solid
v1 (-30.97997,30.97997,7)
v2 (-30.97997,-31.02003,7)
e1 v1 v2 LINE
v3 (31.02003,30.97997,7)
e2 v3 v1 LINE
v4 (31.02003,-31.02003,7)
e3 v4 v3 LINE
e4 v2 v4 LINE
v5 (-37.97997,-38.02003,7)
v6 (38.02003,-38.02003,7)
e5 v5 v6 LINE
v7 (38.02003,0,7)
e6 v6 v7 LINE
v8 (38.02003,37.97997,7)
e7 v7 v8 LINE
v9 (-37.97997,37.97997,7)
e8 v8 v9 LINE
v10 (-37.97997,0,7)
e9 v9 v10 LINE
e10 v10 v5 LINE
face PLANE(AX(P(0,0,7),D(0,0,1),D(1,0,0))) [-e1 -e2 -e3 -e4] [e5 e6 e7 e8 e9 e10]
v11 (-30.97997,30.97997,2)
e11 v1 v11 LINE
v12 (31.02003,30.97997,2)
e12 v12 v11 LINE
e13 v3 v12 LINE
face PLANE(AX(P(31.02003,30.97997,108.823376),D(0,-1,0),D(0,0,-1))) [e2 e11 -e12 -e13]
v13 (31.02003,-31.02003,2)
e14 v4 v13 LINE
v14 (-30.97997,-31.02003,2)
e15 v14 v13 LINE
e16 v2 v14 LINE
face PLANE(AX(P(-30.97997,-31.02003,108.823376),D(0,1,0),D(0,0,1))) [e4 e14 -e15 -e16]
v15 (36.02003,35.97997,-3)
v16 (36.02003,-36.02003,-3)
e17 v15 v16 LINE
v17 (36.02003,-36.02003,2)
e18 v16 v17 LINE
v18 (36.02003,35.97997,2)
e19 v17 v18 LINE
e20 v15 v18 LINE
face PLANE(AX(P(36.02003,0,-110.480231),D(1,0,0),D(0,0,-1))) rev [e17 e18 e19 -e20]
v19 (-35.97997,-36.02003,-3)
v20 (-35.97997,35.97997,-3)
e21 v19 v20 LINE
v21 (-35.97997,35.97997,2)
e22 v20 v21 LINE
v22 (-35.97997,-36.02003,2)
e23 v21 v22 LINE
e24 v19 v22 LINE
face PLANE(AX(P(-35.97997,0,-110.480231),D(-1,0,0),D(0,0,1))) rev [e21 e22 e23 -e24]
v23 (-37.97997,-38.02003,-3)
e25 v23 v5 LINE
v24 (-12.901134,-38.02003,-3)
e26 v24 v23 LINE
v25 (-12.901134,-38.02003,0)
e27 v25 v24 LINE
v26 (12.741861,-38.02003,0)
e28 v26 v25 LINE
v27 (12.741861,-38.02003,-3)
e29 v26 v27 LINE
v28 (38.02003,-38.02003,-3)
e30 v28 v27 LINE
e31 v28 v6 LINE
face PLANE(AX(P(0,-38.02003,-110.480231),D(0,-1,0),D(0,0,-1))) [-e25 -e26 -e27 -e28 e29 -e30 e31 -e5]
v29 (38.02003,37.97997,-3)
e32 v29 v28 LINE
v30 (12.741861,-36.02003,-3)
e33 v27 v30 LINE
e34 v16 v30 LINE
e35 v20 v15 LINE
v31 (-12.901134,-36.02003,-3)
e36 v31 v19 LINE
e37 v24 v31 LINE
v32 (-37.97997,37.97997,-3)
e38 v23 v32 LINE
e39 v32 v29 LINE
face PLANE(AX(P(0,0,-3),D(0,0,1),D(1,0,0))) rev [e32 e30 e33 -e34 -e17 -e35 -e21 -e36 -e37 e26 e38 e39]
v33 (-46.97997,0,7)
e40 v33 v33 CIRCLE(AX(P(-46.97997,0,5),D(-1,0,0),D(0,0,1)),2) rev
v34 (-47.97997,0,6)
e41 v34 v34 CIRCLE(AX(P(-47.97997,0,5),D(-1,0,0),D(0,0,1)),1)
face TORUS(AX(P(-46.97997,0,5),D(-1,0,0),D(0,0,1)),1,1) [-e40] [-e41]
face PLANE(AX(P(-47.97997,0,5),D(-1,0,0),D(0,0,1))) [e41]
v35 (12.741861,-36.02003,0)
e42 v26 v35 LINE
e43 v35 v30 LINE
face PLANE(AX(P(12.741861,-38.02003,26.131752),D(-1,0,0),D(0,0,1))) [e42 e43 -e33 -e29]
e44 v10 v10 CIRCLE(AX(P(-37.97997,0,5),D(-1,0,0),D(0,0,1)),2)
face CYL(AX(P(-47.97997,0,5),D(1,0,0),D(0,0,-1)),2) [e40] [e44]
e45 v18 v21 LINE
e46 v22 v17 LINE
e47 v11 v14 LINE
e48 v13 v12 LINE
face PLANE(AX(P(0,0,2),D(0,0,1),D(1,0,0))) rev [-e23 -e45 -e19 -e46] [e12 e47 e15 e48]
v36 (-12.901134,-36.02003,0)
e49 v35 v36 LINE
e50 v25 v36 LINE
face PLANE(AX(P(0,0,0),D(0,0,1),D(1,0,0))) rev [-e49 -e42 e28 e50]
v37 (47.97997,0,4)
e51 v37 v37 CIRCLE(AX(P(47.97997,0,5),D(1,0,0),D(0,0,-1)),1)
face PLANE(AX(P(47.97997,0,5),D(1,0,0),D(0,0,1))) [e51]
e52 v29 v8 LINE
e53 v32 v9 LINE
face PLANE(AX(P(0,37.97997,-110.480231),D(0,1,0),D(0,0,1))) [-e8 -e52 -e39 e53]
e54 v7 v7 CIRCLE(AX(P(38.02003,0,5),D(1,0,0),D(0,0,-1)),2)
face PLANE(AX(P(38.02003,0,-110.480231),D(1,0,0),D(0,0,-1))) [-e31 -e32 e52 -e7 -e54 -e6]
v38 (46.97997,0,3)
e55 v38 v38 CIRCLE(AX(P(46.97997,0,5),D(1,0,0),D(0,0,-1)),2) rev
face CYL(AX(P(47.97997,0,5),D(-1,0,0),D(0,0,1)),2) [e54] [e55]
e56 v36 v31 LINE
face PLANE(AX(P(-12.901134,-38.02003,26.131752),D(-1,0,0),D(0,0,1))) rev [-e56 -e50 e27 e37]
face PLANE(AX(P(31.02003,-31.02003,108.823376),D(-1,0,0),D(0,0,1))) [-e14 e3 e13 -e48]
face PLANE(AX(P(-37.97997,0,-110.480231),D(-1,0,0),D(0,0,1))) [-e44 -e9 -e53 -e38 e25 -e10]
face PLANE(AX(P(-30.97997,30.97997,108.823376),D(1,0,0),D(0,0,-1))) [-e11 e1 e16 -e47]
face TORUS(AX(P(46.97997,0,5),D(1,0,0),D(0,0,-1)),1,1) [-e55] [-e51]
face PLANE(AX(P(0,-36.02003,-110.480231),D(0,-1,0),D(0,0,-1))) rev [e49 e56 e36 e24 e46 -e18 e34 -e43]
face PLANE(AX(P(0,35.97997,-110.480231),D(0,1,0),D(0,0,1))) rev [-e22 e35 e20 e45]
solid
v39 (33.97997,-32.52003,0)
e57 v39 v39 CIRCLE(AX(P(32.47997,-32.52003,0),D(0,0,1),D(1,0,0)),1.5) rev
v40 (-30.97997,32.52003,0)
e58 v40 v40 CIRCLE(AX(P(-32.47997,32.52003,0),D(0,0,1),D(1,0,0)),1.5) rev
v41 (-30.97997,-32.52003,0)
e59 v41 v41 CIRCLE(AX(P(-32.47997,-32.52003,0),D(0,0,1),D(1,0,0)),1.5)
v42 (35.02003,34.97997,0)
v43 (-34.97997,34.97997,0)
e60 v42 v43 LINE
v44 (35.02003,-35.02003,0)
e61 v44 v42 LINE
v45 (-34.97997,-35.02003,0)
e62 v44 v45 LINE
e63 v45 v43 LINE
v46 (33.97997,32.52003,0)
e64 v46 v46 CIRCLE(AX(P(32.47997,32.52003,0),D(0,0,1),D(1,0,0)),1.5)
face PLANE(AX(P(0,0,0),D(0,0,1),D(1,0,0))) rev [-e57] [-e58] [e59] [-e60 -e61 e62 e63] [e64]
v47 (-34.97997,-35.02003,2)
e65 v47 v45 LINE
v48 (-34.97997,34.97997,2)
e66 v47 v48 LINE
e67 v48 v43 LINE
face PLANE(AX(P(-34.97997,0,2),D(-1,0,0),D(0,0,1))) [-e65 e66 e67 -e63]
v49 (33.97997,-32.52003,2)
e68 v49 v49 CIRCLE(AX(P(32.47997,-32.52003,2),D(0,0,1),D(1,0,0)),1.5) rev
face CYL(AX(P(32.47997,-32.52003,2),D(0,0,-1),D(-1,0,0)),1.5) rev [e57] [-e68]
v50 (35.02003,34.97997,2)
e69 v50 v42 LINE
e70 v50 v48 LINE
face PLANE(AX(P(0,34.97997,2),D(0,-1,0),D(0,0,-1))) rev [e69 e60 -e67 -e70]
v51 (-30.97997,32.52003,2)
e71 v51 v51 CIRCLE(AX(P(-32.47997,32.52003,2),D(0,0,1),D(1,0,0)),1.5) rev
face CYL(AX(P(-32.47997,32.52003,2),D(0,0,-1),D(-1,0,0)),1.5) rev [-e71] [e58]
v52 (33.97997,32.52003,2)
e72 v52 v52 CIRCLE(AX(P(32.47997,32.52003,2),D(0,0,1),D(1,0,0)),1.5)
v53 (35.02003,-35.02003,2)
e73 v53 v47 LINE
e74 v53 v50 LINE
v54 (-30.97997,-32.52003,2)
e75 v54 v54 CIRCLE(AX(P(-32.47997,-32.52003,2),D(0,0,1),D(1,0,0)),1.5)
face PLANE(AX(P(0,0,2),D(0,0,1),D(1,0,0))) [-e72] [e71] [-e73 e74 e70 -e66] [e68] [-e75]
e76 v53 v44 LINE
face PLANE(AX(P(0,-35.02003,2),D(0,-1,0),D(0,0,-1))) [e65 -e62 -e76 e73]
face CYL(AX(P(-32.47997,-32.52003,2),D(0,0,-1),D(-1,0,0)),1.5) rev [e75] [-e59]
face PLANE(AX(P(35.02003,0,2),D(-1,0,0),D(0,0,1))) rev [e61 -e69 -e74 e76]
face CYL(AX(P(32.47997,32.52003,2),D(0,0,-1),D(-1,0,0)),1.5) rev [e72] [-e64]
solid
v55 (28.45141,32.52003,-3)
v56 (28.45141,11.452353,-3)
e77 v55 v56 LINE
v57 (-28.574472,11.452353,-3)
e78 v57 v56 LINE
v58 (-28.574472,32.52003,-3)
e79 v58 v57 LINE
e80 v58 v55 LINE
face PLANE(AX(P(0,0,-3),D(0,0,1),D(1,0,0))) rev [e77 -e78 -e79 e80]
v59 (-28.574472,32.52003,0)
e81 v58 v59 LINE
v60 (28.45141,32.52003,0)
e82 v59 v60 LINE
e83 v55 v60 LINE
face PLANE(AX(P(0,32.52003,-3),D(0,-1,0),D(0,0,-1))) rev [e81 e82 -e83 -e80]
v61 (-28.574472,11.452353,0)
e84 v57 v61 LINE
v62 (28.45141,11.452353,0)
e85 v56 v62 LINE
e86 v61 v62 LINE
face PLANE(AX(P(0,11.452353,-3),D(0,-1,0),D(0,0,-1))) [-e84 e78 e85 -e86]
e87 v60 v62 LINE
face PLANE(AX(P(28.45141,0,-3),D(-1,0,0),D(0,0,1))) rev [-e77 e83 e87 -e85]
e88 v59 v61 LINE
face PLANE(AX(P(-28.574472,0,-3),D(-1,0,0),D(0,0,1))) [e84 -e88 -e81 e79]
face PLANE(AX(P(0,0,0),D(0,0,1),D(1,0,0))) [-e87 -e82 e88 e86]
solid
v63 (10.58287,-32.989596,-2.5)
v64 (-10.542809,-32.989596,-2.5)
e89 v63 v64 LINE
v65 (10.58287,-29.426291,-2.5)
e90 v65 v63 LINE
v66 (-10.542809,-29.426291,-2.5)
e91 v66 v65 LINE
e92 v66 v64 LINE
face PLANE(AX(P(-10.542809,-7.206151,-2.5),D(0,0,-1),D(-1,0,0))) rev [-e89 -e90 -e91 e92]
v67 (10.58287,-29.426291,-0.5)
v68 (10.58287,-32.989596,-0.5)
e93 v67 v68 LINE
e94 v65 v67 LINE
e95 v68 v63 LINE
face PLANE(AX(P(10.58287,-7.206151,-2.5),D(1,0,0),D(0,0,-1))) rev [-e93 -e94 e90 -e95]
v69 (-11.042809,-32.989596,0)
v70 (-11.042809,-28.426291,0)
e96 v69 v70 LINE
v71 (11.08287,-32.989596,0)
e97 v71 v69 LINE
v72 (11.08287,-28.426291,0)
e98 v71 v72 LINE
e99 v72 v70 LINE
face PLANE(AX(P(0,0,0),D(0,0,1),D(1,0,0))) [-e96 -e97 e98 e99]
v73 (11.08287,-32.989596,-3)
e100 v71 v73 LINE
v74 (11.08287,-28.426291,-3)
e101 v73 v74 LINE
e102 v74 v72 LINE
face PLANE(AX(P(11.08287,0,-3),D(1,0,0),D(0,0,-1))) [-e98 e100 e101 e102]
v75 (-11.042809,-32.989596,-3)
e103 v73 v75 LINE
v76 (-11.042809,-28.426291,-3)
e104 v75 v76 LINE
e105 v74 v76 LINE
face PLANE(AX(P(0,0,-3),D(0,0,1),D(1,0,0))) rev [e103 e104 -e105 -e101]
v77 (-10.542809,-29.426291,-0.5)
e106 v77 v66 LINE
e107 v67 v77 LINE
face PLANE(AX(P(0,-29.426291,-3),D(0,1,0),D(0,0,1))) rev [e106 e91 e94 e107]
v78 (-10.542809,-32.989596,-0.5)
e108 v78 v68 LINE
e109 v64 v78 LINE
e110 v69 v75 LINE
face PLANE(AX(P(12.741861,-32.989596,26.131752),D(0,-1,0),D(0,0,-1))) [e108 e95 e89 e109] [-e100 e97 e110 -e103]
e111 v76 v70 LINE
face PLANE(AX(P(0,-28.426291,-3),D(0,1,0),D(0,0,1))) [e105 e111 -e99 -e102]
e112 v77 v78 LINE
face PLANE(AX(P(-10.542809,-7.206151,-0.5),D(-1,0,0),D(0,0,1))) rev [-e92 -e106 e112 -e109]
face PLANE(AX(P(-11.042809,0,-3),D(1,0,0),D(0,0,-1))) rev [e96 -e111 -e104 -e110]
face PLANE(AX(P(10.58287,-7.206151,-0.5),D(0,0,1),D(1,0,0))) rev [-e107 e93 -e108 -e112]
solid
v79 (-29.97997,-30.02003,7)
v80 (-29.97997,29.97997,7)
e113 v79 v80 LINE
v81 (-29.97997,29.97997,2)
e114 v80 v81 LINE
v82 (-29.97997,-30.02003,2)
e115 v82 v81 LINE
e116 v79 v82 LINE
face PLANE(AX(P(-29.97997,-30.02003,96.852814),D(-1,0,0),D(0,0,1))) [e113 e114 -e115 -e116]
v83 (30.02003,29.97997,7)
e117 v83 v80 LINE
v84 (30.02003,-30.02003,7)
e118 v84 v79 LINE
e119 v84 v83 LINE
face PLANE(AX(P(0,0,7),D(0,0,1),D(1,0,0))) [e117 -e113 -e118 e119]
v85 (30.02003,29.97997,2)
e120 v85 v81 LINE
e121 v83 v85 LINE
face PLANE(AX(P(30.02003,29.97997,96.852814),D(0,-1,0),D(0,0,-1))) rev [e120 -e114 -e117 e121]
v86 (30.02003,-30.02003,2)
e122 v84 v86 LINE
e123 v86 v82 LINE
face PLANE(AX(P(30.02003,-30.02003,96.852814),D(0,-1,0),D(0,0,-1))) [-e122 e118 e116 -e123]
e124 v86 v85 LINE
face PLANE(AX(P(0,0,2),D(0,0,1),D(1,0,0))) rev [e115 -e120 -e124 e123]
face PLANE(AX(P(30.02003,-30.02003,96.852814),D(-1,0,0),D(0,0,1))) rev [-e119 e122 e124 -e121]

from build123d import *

# Parameters (mm, degrees)
RFID_READER_OUTLINE_W    = 70
RFID_READER_OUTLINE_H    = 70
RFID_READER_OUTLINE_R    = 1.5
RFID_READER_DEPTH        = 2
RFID_READER_START        = -28.574472263
RFID_READER_2_OUTLINE_W  = 21.067677481
RFID_READER_2_OUTLINE_H  = 3
RFID_READER_2_DEPTH      = 57.02588195
RFID_READER_START_2      = 2
RFID_READER_3_OUTLINE_W  = 60
RFID_READER_3_OUTLINE_H  = 60
RFID_READER_3_DEPTH      = 5
RFID_READER_START_3      = -11.042809432
RFID_READER_4_DEPTH      = 22.125679749
RFID_READER_5_OUTLINE_W  = 5.593739236
RFID_READER_5_OUTLINE_H  = 2
RFID_READER_5_DEPTH      = 0.5
RFID_READER_START_4      = 10.582870317
RFID_READER_6_OUTLINE_W  = 5.593739236
RFID_READER_6_OUTLINE_H  = 2
RFID_READER_6_DEPTH      = 0.5
SKETCH2_W                = 72
SKETCH2_H                = 72
SKETCH2_W_2              = 62
SKETCH2_H_2              = 62
BOSS_EXTRUDE5_DEPTH      = 5
BOSS_EXTRUDE7_START      = -5
SKETCH2_8_W              = 76
SKETCH2_8_H              = 76
SKETCH2_8_W_2            = 72
SKETCH2_8_H_2            = 72
BOSS_EXTRUDE7_DEPTH      = 10
SKETCH4_R                = 2
BOSS_EXTRUDE12_DEPTH     = 10
FILLET1_R                = 1
FILLET1_OF_MIRROR1_R     = 1
CUT_EXTRUDE1_START       = -3
CUT_EXTRUDE1_OUTLINE_W   = 25.642995067
CUT_EXTRUDE1_OUTLINE_H   = 2
CUT_EXTRUDE1_OUTLINE_W_2 = 22.125679749
CUT_EXTRUDE1_OUTLINE_H_2 = 2.030434915
CUT_EXTRUDE1_DEPTH       = 3


# Read off the part's stored shape, not the designer's step: RFID_reader, Cut-Extrude1
with BuildPart() as part:
    # RFID_reader outline → RFID_reader (new body)
    with BuildSketch(Plane.XY):
        with Locations((0.020030443, -0.020030443)):
            Rectangle(RFID_READER_OUTLINE_W, RFID_READER_OUTLINE_H)
        with Locations((-32.479969557, -32.520030443)):
            Circle(RFID_READER_OUTLINE_R, mode=Mode.SUBTRACT)
        with Locations((32.479969557, -32.520030443)):
            Circle(RFID_READER_OUTLINE_R, mode=Mode.SUBTRACT)
        with Locations((-32.479969557, 32.520030443)):
            Circle(RFID_READER_OUTLINE_R, mode=Mode.SUBTRACT)
        with Locations((32.479969557, 32.520030443)):
            Circle(RFID_READER_OUTLINE_R, mode=Mode.SUBTRACT)
    extrude(amount=RFID_READER_DEPTH)


with BuildPart() as body_2:
    # RFID_reader 2 outline → RFID_reader 2 (new body)
    with BuildSketch(Plane.YZ.offset(RFID_READER_START)):
        with Locations((21.986191703, -1.5)):
            Rectangle(RFID_READER_2_OUTLINE_W, RFID_READER_2_OUTLINE_H)
    extrude(amount=RFID_READER_2_DEPTH)


with BuildPart() as body_3:
    # RFID_reader 3 outline → RFID_reader 3 (new body)
    with BuildSketch(Plane.XY.offset(RFID_READER_START_2)):
        with Locations((0.020030443, -0.020030443)):
            Rectangle(RFID_READER_3_OUTLINE_W, RFID_READER_3_OUTLINE_H)
    extrude(amount=RFID_READER_3_DEPTH)


with BuildPart() as body_4:
    # RFID_reader 4 outline → RFID_reader 4 (new body)
    with BuildSketch(Plane.YZ.offset(RFID_READER_START_3)):
        Polygon((-35.020030443, -3), (-28.426291207, -3), (-28.426291207, 0), (-35.020030443, 0), (-35.020030443, -0.5), (-29.426291207, -0.5), (-29.426291207, -2.5), (-35.020030443, -2.5), align=None)
    extrude(amount=RFID_READER_4_DEPTH)

    # RFID_reader 5 outline → RFID_reader 5 (add)
    with BuildSketch(Plane.YZ.offset(RFID_READER_START_3)):
        with Locations((-32.223160825, -1.5)):
            Rectangle(RFID_READER_5_OUTLINE_W, RFID_READER_5_OUTLINE_H)
    extrude(amount=RFID_READER_5_DEPTH)

    # RFID_reader 6 outline → RFID_reader 6 (add)
    with BuildSketch(Plane.YZ.offset(RFID_READER_START_4)):
        with Locations((-32.223160825, -1.5)):
            Rectangle(RFID_READER_6_OUTLINE_W, RFID_READER_6_OUTLINE_H)
    extrude(amount=RFID_READER_6_DEPTH)


with BuildPart() as body_5:
    # Sketch2 → Boss-Extrude5 (new body)
    with BuildSketch(Plane.XY.offset(2)):
        with Locations((0.020030443, -0.020030443)):
            Rectangle(SKETCH2_W, SKETCH2_H)
        with Locations((0.020030443, -0.020030443)):
            Rectangle(SKETCH2_W_2, SKETCH2_H_2, mode=Mode.SUBTRACT)
    extrude(amount=BOSS_EXTRUDE5_DEPTH)

    # Sketch2<8> → Boss-Extrude7 (add)
    with BuildSketch(Plane.XY.offset(2).offset(BOSS_EXTRUDE7_START)):
        with Locations((0.020030443, -0.020030443)):
            Rectangle(SKETCH2_8_W, SKETCH2_8_H)
        with Locations((0.020030443, -0.020030443)):
            Rectangle(SKETCH2_8_W_2, SKETCH2_8_H_2, mode=Mode.SUBTRACT)
    extrude(amount=BOSS_EXTRUDE7_DEPTH)

    # Sketch4 → Boss-Extrude12 (add)
    with BuildSketch(Plane.ZY.offset(37.979969557)):
        with Locations((5, 0)):
            Circle(SKETCH4_R)
    boss_extrude12 = extrude(amount=BOSS_EXTRUDE12_DEPTH)

    # Fillet1
    fillet1_edges = [body_5.edges().sort_by_distance(p)[0] for p in [
        (-47.979969557, 0, 3),
    ]]
    fillet(fillet1_edges, radius=FILLET1_R)

    # Mirror1: Boss-Extrude12 across plane
    add(boss_extrude12.mirror(Plane(origin=(0, 0, 0), x_dir=(0, 0, 1), z_dir=(1, 0, 0))))

    # Fillet1 of Mirror1
    fillet1_of_mirror1_edges = [body_5.edges().sort_by_distance(p)[0] for p in [
        (47.979969557, 0, 3),
    ]]
    fillet(fillet1_of_mirror1_edges, radius=FILLET1_OF_MIRROR1_R)


with BuildPart() as cut_extrude1_tool:
    # Cut-Extrude1 outline → Cut-Extrude1 (new body)
    with BuildSketch(Plane(origin=(0, 0, -3), x_dir=(-1, 0, 0), z_dir=(0, 0, -1)).offset(CUT_EXTRUDE1_START)):
        with Locations((0.07963663, -37.020030443)):
            Rectangle(CUT_EXTRUDE1_OUTLINE_W, CUT_EXTRUDE1_OUTLINE_H)
        with Locations((-0.020030443, -34.004812986)):
            Rectangle(CUT_EXTRUDE1_OUTLINE_W_2, CUT_EXTRUDE1_OUTLINE_H_2)
    extrude(amount=CUT_EXTRUDE1_DEPTH)


with BuildPart() as body_4_1:
    add(body_4.part)

    # Cut-Extrude1: cut by cut_extrude1_tool
    add(cut_extrude1_tool.part, mode=Mode.SUBTRACT)


with BuildPart() as body_5_1:
    add(body_5.part)

    # Cut-Extrude1: cut by cut_extrude1_tool
    add(cut_extrude1_tool.part, mode=Mode.SUBTRACT)


solid = Compound([part.part, body_2.part, body_3.part, body_4_1.part, body_5_1.part])
